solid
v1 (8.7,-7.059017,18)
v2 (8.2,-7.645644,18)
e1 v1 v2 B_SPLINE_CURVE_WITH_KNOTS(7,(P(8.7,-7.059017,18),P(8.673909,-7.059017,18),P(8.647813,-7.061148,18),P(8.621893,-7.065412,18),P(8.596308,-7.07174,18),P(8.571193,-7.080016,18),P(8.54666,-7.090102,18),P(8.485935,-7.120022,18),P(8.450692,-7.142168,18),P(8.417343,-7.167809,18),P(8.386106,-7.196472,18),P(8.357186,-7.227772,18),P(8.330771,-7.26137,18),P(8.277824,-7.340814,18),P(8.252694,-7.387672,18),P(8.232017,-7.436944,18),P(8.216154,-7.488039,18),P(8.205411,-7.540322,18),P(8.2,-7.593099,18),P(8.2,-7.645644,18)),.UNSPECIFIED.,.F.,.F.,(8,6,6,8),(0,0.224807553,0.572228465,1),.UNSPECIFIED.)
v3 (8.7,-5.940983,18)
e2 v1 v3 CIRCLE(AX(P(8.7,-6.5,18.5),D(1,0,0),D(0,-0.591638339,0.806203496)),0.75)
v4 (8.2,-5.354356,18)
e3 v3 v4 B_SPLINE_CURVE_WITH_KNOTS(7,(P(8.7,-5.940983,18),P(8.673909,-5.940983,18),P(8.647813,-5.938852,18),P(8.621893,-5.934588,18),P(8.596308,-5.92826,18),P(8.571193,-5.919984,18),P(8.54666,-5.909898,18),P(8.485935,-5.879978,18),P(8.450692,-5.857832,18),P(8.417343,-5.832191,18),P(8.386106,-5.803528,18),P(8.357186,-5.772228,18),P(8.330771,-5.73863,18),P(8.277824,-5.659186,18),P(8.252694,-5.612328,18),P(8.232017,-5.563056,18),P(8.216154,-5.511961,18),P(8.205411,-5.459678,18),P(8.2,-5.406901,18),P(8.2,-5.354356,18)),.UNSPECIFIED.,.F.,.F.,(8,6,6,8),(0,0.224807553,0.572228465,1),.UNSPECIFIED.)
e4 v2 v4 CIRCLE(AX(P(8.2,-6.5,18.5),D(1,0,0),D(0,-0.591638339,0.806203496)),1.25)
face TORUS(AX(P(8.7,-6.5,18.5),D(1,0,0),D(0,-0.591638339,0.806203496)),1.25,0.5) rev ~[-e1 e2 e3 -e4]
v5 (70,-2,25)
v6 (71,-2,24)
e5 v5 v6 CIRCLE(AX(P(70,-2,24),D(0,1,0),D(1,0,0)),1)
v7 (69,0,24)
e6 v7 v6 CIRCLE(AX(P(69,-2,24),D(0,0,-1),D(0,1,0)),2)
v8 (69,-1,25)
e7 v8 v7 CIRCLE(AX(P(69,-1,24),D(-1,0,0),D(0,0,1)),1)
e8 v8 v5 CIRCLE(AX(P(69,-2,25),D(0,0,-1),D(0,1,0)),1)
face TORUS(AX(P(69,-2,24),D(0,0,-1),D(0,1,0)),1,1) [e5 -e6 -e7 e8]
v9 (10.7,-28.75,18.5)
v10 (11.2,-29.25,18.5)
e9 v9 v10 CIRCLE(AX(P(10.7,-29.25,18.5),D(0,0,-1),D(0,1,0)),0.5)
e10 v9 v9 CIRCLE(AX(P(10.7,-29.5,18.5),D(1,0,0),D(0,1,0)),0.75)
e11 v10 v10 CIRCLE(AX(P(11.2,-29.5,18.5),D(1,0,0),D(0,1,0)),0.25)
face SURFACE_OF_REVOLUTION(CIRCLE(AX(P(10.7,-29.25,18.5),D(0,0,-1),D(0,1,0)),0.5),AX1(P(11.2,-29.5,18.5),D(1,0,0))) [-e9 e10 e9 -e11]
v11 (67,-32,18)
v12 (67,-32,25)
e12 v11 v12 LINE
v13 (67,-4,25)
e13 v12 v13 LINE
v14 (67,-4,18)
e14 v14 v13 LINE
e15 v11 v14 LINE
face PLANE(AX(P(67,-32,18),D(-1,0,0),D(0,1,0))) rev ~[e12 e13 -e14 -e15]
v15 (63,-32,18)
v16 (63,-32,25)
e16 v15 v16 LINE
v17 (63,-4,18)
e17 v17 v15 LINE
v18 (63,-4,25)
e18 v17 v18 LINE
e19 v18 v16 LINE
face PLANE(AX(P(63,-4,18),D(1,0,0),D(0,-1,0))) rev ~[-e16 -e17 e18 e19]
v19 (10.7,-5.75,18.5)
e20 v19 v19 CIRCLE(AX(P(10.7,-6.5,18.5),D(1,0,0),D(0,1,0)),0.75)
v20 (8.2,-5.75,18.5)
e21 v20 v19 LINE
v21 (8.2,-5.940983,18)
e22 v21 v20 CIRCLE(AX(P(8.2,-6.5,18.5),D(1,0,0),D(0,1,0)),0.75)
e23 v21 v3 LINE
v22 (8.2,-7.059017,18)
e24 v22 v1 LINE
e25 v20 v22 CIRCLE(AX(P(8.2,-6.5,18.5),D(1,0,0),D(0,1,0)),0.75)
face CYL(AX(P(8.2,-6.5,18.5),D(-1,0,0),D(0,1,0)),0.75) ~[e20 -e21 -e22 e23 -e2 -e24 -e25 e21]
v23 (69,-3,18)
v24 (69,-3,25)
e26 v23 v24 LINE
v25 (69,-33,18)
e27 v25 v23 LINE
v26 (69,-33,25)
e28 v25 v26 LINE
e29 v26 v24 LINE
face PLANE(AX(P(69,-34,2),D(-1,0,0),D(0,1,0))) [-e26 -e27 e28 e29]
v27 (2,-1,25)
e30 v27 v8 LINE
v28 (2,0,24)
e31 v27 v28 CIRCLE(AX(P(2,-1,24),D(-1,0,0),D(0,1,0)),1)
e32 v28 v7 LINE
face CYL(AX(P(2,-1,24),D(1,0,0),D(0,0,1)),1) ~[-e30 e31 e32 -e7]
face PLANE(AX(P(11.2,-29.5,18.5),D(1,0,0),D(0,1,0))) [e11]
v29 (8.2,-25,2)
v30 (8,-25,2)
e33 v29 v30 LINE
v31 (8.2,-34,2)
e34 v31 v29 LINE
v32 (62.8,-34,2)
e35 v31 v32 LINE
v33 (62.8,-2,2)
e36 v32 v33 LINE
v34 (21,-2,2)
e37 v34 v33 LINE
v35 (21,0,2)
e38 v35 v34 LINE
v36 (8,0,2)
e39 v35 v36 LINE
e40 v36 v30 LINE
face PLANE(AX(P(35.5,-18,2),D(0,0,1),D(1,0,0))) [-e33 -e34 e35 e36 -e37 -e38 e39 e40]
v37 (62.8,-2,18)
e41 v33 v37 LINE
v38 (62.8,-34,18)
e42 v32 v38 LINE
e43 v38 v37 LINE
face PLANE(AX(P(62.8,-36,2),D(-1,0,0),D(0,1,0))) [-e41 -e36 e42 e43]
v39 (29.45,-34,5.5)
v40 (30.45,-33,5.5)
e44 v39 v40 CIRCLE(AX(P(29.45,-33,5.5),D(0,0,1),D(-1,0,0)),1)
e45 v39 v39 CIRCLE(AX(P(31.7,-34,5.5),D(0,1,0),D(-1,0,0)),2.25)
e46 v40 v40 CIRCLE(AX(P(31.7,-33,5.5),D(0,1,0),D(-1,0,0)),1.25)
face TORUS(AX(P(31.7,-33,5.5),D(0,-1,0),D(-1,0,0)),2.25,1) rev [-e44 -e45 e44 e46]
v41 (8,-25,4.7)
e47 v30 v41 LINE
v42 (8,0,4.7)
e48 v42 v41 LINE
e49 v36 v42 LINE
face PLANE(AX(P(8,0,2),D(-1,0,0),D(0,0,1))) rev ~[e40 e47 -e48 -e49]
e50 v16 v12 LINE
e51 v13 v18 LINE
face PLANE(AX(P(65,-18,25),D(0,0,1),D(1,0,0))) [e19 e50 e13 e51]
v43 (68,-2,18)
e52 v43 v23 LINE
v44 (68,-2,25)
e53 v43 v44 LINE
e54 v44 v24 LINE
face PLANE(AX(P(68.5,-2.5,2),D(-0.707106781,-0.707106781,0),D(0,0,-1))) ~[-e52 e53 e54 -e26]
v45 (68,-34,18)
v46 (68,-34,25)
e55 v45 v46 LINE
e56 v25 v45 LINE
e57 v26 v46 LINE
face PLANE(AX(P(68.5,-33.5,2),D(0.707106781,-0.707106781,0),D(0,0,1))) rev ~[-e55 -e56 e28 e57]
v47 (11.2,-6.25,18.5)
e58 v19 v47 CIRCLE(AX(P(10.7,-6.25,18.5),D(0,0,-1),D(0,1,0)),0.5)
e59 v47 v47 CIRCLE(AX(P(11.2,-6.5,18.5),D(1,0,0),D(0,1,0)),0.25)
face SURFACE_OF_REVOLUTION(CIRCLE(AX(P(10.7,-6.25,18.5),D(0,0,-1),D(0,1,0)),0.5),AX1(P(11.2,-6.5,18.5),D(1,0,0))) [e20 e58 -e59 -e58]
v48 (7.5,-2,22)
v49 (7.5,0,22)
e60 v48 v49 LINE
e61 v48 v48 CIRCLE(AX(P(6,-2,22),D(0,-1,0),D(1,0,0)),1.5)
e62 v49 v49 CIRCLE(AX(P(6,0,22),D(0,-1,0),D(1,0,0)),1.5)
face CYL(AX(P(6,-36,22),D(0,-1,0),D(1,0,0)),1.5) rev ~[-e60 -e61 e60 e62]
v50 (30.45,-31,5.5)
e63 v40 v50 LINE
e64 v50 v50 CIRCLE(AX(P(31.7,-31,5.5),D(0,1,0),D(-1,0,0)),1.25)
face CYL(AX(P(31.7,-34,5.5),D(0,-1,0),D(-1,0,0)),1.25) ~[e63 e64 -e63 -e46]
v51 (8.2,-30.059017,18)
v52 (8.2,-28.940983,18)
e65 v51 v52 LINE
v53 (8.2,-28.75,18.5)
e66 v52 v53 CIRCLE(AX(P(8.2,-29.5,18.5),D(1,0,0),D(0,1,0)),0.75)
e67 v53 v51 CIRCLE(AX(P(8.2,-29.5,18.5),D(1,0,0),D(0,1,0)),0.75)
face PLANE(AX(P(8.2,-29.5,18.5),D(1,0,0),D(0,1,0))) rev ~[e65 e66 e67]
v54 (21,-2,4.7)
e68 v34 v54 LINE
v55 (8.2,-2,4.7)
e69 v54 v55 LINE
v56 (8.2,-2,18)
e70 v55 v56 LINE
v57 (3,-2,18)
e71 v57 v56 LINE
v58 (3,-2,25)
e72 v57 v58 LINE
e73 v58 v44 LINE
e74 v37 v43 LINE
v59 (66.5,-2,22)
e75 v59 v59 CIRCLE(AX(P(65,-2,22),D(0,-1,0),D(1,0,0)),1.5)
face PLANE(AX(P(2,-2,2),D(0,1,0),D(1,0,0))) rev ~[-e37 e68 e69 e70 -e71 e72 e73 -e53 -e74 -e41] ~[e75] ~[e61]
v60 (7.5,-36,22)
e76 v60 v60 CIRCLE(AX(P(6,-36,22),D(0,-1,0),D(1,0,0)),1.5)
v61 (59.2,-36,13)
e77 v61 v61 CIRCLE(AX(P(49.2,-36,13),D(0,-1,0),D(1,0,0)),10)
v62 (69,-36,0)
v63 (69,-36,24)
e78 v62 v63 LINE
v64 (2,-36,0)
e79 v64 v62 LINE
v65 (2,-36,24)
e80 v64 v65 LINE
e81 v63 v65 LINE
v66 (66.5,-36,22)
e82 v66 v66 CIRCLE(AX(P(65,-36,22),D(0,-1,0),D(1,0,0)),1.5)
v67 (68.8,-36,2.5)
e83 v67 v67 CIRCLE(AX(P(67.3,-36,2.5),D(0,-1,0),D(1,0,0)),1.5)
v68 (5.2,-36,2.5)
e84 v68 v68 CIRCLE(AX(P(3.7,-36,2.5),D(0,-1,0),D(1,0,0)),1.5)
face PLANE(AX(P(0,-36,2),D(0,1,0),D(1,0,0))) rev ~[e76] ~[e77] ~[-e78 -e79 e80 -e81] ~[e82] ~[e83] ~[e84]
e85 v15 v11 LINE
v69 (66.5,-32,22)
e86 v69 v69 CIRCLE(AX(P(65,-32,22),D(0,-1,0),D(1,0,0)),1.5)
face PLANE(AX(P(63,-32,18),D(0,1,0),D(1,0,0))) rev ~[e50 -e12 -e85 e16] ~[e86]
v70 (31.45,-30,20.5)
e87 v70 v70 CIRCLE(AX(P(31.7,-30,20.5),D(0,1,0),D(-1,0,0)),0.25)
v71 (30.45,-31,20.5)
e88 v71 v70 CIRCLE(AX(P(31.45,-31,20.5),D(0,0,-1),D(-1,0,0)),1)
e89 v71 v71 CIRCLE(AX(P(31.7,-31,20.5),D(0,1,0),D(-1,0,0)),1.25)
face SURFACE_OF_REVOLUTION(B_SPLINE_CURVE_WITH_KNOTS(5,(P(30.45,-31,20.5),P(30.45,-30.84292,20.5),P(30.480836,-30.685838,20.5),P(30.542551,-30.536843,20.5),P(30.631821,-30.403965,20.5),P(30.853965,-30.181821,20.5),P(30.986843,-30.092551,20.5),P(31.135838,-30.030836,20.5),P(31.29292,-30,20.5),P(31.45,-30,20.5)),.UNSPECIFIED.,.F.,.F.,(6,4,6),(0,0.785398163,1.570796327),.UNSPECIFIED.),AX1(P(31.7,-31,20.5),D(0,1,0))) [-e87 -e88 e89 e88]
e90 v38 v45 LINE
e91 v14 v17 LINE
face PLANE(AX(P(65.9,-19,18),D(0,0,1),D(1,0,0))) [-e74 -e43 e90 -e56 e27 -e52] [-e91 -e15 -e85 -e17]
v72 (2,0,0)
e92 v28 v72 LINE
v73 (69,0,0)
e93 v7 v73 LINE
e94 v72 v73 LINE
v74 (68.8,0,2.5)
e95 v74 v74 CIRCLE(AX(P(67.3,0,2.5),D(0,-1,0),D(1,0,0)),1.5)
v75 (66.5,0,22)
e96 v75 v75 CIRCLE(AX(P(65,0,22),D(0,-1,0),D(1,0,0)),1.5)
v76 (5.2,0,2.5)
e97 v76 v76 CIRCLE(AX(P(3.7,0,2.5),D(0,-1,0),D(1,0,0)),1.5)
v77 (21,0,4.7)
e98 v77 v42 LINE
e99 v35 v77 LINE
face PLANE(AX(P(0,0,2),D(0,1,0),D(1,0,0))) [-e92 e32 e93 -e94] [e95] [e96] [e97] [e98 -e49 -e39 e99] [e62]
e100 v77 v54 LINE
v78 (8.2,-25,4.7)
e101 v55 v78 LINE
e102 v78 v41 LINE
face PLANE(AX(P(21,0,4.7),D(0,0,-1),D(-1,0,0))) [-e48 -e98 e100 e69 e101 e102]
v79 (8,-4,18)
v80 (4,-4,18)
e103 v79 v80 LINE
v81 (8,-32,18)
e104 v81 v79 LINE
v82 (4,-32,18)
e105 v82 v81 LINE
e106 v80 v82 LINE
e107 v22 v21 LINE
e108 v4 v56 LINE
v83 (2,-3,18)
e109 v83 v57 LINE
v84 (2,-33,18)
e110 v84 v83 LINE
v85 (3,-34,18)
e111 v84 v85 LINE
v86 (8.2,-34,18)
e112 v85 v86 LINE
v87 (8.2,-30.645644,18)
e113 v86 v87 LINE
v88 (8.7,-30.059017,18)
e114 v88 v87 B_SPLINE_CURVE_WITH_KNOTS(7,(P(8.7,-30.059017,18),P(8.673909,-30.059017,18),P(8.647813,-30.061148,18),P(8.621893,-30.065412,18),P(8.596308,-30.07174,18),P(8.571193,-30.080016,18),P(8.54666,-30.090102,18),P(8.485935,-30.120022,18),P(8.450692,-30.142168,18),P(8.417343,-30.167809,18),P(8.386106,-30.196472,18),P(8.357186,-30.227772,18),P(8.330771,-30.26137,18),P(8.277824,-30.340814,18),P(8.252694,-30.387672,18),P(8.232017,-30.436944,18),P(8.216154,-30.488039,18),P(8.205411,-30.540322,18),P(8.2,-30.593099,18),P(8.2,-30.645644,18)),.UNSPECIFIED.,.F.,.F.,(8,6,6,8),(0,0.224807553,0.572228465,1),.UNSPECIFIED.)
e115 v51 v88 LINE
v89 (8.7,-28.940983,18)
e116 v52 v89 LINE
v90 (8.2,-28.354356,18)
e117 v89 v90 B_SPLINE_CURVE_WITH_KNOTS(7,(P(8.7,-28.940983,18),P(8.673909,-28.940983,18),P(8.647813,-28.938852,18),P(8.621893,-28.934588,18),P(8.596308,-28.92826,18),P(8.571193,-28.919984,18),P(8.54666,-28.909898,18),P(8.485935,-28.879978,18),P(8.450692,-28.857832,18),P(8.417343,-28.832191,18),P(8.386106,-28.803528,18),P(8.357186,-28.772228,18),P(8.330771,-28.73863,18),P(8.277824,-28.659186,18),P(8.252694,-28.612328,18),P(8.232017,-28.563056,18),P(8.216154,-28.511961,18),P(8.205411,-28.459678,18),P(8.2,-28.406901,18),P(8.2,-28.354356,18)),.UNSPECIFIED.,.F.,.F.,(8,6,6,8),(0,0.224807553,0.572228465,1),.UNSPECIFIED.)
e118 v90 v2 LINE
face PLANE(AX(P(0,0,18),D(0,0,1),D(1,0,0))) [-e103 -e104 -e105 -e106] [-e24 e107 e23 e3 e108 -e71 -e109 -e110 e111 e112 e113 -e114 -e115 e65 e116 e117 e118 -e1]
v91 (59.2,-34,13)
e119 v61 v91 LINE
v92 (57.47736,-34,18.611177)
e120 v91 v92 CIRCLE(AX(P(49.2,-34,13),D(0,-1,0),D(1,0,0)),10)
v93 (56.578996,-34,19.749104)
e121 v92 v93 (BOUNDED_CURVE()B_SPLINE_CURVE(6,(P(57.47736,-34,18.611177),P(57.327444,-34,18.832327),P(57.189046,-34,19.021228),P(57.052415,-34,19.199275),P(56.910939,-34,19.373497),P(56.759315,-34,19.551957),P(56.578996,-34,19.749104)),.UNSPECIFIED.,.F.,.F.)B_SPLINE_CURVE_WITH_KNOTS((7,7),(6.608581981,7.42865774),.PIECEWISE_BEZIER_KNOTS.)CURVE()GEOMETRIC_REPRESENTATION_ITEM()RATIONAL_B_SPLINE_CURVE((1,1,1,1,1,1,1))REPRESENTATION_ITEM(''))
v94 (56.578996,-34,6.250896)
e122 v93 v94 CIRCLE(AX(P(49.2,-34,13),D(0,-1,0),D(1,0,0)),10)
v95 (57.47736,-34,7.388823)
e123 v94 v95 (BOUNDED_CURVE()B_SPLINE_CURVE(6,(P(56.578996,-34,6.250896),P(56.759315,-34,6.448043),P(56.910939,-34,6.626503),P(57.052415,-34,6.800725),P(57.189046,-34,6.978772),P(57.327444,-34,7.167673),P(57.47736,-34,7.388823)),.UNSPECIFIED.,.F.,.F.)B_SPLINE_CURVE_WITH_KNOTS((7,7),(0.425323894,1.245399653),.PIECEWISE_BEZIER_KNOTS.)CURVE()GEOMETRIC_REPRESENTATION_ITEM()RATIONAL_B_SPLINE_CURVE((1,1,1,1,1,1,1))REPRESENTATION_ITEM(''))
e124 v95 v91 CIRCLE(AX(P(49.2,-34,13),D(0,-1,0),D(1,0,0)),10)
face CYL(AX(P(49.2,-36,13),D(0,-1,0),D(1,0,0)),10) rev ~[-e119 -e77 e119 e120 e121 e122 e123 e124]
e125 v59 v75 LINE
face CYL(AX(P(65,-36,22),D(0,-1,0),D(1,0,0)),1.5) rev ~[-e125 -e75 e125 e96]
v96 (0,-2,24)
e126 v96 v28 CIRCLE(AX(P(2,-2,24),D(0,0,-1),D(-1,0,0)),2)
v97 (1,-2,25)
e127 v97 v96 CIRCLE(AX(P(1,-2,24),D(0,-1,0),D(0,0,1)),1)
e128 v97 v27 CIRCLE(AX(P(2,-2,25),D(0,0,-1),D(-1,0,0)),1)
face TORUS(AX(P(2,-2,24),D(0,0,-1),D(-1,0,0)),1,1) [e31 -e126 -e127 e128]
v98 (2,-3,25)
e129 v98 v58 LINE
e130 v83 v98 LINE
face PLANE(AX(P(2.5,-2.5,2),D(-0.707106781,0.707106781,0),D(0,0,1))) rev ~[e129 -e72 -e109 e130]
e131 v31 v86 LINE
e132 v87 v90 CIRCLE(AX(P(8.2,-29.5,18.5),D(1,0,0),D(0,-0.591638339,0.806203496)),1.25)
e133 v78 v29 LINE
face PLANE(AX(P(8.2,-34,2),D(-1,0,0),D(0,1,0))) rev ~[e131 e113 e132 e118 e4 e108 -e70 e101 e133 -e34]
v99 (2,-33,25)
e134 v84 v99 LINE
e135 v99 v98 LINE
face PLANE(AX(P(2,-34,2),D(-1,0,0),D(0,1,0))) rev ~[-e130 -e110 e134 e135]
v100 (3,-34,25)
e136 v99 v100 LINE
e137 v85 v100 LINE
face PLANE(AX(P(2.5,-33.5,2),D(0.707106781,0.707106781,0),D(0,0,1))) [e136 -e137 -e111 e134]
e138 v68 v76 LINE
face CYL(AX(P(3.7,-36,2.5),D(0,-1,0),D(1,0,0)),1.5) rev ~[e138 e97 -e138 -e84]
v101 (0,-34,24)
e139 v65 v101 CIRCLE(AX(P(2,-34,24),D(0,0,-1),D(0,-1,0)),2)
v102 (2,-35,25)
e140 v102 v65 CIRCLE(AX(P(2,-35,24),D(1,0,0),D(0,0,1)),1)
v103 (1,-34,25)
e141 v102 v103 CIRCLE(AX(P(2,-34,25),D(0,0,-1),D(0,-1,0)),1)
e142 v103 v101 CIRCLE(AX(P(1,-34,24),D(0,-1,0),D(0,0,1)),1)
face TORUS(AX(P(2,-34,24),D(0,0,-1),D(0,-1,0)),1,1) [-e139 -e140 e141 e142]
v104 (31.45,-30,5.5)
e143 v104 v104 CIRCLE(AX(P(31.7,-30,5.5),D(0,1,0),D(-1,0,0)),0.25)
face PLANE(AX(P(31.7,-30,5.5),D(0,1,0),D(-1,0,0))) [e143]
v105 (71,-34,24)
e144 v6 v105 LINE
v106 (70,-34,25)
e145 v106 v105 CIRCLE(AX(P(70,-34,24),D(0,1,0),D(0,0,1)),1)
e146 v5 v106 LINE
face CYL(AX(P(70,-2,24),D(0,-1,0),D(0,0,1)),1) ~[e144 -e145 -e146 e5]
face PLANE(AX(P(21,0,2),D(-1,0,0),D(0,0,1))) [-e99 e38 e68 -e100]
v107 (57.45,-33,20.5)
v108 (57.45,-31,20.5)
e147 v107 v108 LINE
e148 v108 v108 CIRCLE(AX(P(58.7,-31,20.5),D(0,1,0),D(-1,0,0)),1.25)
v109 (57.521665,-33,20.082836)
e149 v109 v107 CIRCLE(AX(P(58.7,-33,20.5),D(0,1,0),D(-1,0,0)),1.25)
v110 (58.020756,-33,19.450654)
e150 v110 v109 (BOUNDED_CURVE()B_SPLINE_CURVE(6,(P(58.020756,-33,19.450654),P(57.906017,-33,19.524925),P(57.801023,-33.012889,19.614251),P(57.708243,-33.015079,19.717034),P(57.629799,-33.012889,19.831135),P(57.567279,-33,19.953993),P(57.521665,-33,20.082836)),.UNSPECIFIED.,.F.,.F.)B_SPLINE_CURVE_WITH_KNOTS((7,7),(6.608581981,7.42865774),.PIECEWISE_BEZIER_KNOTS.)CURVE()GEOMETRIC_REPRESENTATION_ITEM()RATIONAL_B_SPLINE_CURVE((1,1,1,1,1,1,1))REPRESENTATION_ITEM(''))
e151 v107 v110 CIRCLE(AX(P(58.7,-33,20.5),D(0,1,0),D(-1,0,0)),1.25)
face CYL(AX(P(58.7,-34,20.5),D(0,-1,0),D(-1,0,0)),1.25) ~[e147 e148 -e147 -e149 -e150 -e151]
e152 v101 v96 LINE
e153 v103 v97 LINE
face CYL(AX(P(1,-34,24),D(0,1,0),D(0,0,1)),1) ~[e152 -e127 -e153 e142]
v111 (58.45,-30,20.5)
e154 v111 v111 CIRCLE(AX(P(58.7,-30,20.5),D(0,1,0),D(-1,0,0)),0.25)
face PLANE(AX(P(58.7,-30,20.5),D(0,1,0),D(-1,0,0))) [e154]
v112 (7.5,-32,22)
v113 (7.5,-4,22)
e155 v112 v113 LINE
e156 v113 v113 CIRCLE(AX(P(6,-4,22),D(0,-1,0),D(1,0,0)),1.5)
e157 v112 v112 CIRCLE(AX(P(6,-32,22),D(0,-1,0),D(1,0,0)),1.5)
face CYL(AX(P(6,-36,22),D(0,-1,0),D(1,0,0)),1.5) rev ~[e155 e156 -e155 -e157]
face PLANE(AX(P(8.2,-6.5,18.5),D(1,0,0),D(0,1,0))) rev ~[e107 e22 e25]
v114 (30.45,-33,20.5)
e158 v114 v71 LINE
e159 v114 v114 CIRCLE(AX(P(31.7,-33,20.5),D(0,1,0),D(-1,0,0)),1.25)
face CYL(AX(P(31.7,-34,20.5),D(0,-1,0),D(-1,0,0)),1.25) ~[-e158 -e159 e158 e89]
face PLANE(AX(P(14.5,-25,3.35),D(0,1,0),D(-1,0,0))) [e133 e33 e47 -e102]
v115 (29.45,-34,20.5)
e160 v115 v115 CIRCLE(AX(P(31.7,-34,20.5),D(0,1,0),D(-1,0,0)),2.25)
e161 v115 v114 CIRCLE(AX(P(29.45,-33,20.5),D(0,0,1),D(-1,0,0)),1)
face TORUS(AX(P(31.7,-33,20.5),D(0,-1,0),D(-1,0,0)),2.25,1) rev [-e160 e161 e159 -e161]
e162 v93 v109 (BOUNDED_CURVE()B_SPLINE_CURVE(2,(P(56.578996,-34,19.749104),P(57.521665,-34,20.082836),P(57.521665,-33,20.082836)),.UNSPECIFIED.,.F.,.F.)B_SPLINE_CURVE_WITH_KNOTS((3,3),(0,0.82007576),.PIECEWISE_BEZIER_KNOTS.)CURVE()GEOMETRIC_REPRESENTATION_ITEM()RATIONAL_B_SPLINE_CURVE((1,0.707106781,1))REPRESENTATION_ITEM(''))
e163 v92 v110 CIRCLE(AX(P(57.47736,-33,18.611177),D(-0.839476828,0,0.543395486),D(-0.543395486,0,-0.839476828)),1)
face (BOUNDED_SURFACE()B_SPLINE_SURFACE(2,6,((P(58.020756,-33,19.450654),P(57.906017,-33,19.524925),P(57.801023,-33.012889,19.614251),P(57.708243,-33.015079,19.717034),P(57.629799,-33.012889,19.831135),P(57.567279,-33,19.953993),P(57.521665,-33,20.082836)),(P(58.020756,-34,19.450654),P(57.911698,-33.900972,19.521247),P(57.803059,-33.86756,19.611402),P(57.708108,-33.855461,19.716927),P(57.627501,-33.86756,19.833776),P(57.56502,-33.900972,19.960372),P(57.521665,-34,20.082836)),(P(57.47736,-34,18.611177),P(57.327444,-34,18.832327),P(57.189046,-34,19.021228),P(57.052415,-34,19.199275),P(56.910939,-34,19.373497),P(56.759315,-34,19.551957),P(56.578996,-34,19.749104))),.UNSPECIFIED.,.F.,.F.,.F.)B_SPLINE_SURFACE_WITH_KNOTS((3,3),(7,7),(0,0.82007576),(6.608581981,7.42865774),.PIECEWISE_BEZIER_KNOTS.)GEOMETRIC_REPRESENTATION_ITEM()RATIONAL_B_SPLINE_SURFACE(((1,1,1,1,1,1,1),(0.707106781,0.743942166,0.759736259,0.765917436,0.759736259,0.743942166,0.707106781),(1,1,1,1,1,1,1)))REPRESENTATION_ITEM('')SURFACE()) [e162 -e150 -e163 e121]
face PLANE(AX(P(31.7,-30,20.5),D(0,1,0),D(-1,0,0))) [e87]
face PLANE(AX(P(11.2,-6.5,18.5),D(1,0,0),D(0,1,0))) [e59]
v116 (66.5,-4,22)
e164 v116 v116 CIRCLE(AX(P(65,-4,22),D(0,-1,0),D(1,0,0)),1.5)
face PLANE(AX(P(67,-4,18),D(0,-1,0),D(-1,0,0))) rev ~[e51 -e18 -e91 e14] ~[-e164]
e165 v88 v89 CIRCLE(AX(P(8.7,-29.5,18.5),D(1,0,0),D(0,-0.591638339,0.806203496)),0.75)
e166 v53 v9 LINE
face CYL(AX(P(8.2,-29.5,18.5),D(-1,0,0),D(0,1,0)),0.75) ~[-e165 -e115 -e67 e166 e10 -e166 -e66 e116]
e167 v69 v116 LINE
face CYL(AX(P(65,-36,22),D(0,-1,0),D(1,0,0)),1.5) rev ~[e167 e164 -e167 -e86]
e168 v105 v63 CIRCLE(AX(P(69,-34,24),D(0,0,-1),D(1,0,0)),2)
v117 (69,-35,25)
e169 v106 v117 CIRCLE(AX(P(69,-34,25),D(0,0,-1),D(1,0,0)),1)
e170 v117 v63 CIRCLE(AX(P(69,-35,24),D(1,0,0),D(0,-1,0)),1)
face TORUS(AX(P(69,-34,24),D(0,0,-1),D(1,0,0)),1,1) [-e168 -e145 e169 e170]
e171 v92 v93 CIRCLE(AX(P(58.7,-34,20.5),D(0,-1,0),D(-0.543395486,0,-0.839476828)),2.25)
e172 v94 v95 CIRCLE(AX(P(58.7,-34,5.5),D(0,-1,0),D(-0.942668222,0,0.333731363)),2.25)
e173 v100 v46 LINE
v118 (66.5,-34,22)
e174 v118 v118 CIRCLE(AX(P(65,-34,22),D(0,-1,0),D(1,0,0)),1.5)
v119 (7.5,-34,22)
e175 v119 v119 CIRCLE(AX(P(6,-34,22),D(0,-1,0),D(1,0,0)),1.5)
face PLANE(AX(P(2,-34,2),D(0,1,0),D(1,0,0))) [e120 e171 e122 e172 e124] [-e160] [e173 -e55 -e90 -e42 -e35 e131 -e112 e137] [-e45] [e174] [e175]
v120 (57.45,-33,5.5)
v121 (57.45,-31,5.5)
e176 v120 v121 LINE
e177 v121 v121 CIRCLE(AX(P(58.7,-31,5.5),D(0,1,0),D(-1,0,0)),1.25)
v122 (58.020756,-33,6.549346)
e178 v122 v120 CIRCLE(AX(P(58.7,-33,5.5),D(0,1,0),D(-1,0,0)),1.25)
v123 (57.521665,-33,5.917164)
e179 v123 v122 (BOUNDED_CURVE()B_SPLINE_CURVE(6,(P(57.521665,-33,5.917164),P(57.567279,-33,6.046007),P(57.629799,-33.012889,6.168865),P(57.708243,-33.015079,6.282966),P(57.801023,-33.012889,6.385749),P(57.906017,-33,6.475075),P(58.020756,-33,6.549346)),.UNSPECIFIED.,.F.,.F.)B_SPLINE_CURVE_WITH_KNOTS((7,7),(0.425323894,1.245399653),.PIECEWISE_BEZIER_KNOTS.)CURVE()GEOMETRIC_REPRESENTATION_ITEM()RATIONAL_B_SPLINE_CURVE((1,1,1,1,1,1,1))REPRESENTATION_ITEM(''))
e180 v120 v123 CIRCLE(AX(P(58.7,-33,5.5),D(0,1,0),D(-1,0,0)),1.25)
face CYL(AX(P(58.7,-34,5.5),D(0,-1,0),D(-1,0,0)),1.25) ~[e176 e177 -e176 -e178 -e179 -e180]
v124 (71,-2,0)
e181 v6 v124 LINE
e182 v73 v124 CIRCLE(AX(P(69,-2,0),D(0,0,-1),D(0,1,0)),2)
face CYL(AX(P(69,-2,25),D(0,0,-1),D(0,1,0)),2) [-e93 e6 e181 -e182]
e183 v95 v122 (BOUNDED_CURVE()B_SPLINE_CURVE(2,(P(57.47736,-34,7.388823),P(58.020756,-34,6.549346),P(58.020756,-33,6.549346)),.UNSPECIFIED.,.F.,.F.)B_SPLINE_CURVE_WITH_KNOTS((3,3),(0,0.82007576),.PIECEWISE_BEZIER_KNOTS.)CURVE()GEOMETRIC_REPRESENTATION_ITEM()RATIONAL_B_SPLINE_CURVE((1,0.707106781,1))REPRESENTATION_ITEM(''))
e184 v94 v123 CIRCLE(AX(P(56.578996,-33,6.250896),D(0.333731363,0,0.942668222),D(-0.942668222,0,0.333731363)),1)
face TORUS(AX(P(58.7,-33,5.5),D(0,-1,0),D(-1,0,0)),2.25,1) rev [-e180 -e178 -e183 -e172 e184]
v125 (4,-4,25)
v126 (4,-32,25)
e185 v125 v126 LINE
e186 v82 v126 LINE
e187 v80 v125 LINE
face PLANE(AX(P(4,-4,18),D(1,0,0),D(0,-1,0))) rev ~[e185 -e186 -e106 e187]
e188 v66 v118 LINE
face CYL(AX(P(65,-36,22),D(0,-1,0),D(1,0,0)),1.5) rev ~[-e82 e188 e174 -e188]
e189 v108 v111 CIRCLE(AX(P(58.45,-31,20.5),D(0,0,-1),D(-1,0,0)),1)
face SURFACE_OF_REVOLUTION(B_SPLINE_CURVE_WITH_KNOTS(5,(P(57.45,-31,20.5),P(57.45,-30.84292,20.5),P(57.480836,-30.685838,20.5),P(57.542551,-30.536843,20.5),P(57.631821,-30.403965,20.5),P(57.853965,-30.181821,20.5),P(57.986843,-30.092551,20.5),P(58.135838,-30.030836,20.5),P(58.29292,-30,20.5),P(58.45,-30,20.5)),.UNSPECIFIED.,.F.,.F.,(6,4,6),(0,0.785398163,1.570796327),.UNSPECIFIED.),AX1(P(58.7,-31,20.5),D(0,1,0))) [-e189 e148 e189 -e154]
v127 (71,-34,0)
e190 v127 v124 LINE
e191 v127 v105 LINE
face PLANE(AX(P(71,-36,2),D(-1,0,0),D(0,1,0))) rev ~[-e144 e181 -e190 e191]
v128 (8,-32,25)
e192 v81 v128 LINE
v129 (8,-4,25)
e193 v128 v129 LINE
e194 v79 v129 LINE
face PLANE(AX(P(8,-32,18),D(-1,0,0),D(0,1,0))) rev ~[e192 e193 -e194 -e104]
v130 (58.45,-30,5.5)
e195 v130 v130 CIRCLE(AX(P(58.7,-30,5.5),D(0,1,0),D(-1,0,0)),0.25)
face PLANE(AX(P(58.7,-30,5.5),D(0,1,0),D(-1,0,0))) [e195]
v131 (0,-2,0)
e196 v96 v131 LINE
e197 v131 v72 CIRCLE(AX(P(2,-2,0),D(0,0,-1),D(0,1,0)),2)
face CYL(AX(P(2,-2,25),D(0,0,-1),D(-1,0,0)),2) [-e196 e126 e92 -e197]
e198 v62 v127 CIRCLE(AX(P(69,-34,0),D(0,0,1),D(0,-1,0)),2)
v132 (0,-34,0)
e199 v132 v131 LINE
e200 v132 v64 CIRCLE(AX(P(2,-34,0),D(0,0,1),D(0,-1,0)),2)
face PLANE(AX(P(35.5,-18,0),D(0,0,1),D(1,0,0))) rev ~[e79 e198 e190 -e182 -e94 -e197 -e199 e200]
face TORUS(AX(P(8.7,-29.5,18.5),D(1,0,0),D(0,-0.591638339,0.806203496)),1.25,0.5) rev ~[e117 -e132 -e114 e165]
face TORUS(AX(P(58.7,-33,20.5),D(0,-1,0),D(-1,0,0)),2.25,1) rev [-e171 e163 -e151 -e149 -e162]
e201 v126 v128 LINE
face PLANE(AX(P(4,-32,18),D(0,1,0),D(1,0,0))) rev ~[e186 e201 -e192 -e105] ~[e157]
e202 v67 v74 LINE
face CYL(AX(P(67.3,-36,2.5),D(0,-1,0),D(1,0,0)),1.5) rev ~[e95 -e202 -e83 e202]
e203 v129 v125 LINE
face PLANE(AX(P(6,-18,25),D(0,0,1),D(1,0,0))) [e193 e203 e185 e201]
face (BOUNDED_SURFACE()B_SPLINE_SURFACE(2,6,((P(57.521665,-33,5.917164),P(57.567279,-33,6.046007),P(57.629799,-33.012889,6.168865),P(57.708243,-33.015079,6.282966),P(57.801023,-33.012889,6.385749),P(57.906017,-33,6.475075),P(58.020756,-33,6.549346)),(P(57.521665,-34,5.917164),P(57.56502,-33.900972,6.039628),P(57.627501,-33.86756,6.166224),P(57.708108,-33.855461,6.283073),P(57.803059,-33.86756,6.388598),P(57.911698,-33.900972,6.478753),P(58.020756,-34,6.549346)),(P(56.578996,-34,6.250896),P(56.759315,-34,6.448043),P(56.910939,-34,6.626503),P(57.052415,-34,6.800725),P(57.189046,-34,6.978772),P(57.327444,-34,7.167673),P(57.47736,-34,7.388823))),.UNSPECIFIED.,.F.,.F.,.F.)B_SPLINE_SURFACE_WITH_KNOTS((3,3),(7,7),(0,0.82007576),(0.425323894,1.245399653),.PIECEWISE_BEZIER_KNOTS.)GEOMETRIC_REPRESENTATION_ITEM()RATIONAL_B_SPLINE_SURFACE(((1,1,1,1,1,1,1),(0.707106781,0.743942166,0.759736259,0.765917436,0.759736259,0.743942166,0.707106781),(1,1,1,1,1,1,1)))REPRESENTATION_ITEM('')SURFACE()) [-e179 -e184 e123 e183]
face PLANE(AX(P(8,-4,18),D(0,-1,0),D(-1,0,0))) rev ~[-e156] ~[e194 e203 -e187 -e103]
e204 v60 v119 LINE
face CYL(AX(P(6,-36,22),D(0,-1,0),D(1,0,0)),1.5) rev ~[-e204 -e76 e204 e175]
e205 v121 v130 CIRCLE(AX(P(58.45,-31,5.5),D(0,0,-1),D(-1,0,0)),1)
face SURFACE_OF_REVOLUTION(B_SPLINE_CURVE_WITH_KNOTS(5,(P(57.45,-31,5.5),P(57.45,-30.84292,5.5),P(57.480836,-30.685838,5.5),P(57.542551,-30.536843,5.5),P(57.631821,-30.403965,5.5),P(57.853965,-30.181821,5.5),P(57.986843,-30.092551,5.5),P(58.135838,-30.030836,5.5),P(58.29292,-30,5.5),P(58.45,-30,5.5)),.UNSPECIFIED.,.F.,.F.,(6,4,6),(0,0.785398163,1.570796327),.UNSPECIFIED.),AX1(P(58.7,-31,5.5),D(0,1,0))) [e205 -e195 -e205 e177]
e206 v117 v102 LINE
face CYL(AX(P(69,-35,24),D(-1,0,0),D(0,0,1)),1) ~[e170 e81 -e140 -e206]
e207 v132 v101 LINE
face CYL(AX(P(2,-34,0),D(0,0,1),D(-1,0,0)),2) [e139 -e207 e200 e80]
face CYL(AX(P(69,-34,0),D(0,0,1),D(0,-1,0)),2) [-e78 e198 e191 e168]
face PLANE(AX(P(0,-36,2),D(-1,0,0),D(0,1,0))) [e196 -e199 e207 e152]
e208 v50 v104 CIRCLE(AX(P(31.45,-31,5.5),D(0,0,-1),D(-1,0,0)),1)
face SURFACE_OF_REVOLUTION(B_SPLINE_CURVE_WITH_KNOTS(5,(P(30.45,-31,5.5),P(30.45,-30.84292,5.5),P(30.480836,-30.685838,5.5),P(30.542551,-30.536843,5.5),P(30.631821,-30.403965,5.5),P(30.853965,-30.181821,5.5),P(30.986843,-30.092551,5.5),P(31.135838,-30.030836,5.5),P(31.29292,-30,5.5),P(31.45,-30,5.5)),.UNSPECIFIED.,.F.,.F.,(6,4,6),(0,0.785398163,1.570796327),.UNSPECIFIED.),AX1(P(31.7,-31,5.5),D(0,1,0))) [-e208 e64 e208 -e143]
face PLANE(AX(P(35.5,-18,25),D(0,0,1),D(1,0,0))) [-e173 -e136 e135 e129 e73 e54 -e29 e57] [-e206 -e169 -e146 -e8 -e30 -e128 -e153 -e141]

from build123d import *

# Parameters (mm, degrees)
F0_W         = 71
F0_H         = 36
F1_DEPTH     = 2
F2_W         = 71
F2_H         = 36
F2_W_2       = 67
F2_H_2       = 32
F3_DEPTH     = 23
F4_SIZE      = 1
F5_R         = 2
F6_R         = 1
F7_W         = 6.2
F7_H         = 32
F7_H_2       = 34
F8_DEPTH     = 16
F9_R         = 1.5
F10_DEPTH    = 36.001
F12_DEPTH    = 7
F13_R        = 1.5
F14_DEPTH    = 36.001
F17_R        = 10
F18_DEPTH    = 34
F19_R        = 1.25
F20_DEPTH    = 4
F21_R        = 1
F23_R        = 0.75
F24_DEPTH    = 3
F25_T4_ANGLE = 287.4532878227
F25_T9_ANGLE = 287.4532878227
F26_W        = 13
F26_H        = 2.7
F27_DEPTH    = 25


# Not quite as in the source:
# - a fillet or chamfer that OpenCascade refuses, or shapes differently, is made with other operations: its cross-section is extruded or revolved along the edge and cut away or added


with BuildPart() as f1:
    # F0 (on Top) → F1 (new body)
    with BuildSketch(Plane.XY):
        with Locations((35.5, -18)):
            Rectangle(F0_W, F0_H)
    extrude(amount=F1_DEPTH)

    # F2 (on face) → F3 (join)
    with BuildSketch(Plane.XY.offset(2)):
        with Locations((35.5, -18)):
            Rectangle(F2_W, F2_H)
        with Locations((35.5, -18)):
            Rectangle(F2_W_2, F2_H_2, mode=Mode.SUBTRACT)
    extrude(amount=F3_DEPTH)

    # F4
    f4_edges = [f1.edges().sort_by_distance(p)[0] for p in [
        (2, -2, 13.5),
        (2, -34, 13.5),
        (69, -2, 13.5),
        (69, -34, 13.5),
    ]]
    chamfer(f4_edges, length=F4_SIZE)

    # F5
    f5_edges = [f1.edges().sort_by_distance(p)[0] for p in [
        (0, -36, 12.5),
        (71, -36, 12.5),
        (71, 0, 12.5),
        (0, 0, 12.5),
    ]]
    fillet(f5_edges, radius=F5_R)

    # F6
    f6_edges = [f1.edges().sort_by_distance(p)[0] for p in [
        (0, -18, 25),
        (35.5, -36, 25),
        (71, -18, 25),
        (35.5, 0, 25),
    ]]
    fillet(f6_edges, radius=F6_R)

    # F7 (on face) → F8 (join)
    with BuildSketch(Plane.XY.offset(2)):
        with Locations((5.1, -18)):
            Rectangle(F7_W, F7_H)
        with Locations((65.9, -19)):
            Rectangle(F7_W, F7_H_2)
    extrude(amount=F8_DEPTH)

    # F9 (on face) → F10 (cut, through all)
    with BuildSketch(Plane.XZ.offset(36)):
        with Locations((3.7, 2.5)):
            Circle(F9_R)
        with Locations((67.3, 2.5)):
            Circle(F9_R)
    extrude(amount=-F10_DEPTH, mode=Mode.SUBTRACT)

    # F11 (on face) → F12 (join)
    with BuildSketch(Plane.XY.offset(18)):
        Polygon((8, -21.2), (8, -4), (4, -4), (4, -21.2), (4, -32), (8, -32), align=None)
        Polygon((67, -4), (63, -4), (63, -22), (63, -32), (67, -32), (67, -22), align=None)
    extrude(amount=F12_DEPTH)

    # F13 (on face) → F14 (cut, through all)
    with BuildSketch(Plane.XZ.offset(36)):
        with Locations((6, 22)):
            Circle(F13_R)
        with Locations((65, 22)):
            Circle(F13_R)
    extrude(amount=-F14_DEPTH, mode=Mode.SUBTRACT)

    # F17 (on face) → F18 (cut, through all)
    with BuildSketch(Plane.XZ.offset(36)):
        with Locations((49.2, 13)):
            Circle(F17_R)
    extrude(amount=-F18_DEPTH, mode=Mode.SUBTRACT)

    # F19 (on face) → F20 (join)
    with BuildSketch(Plane(origin=(0, -34, 0), x_dir=(-1, 0, 0), z_dir=(0, 1, 0))):
        with Locations((-58.7, 20.5)):
            Circle(F19_R)
        with Locations((-31.7, 20.5)):
            Circle(F19_R)
        with Locations((-31.7, 5.5)):
            Circle(F19_R)
        with Locations((-58.7, 5.5)):
            Circle(F19_R)
    extrude(amount=F20_DEPTH)

    # F21
    f21_edges = [f1.edges().sort_by_distance(p)[0] for p in [
        (57.45, -32, 20.5),
        (59.95, -34, 20.5),
        (59.95, -30, 20.5),
        (57.45, -32, 5.5),
        (59.95, -34, 5.5),
        (59.95, -30, 5.5),
        (30.45, -32, 20.5),
        (32.95, -34, 20.5),
        (32.95, -30, 20.5),
        (30.45, -32, 5.5),
        (32.95, -34, 5.5),
        (32.95, -30, 5.5),
    ]]
    fillet(f21_edges, radius=F21_R)

    # F23 (on face) → F24 (join)
    with BuildSketch(Plane.YZ.offset(8.2)):
        with Locations((-29.5, 18.5)):
            Circle(F23_R)
        with Locations((-6.5, 18.5)):
            Circle(F23_R)
    extrude(amount=F24_DEPTH)

    # F25: fillet of radius 0.5 on 6 edges, made by hand


with BuildPart() as f25_tool2:
    # F25_s3 → F25_t4 (revolve)
    with BuildSketch(Plane(origin=(0, -10.3497936524, -7.5952718618), x_dir=(1, 0, 0), z_dir=(0, 0.8062034954, 0.5916383388))):
        with BuildLine():
            ThreePointArc((8.7, -33.1180956607), (8.3464466094, -33.2645422701), (8.2, -33.6180956607))
            Line((8.2, -33.6180956607), (8.2, -33.1180956607))
            Line((8.2, -33.1180956607), (8.7, -33.1180956607))
        make_face()
    revolve(axis=Axis((8.2, -29.5, 18.5), (1, 0, 0)), revolution_arc=F25_T4_ANGLE)

    split(bisect_by=Plane.XY.offset(18), keep=Keep.BOTTOM)


with BuildPart() as f1_1:
    add(f1.part)

    # F25_t1: union F25_tool2
    add(f25_tool2.part)


with BuildPart() as f25_tool7:
    # F25_s8 → F25_t9 (revolve)
    with BuildSketch(Plane(origin=(0, 4.5993800964, 3.3752887643), x_dir=(1, 0, 0), z_dir=(0, 0.8062034954, 0.5916383388))):
        with BuildLine():
            ThreePointArc((8.7, -19.5104138677), (8.3464466094, -19.6568604771), (8.2, -20.0104138677))
            Line((8.2, -20.0104138677), (8.2, -19.5104138677))
            Line((8.2, -19.5104138677), (8.7, -19.5104138677))
        make_face()
    revolve(axis=Axis((8.2, -6.5, 18.5), (1, 0, 0)), revolution_arc=F25_T9_ANGLE)

    split(bisect_by=Plane.XY.offset(18), keep=Keep.BOTTOM)


with BuildPart() as f1_2:
    add(f1_1.part)

    # F25_t6: union F25_tool7
    add(f25_tool7.part)

    # F25_s11 → F25_t12 (revolve, cut)
    with BuildSketch(Plane.XY.offset(18.5)):
        with BuildLine():
            ThreePointArc((10.7, -28.75), (11.0535533906, -28.8964466094), (11.2, -29.25))
            Line((11.2, -29.25), (11.2, -28.75))
            Line((11.2, -28.75), (10.7, -28.75))
        make_face()
    revolve(axis=Axis((11.2, -29.5, 18.5), (1, 0, 0)), mode=Mode.SUBTRACT)

    # F25_s13 → F25_t14 (revolve, cut)
    with BuildSketch(Plane.XY.offset(18.5)):
        with BuildLine():
            ThreePointArc((10.7, -5.75), (11.0535533906, -5.8964466094), (11.2, -6.25))
            Line((11.2, -6.25), (11.2, -5.75))
            Line((11.2, -5.75), (10.7, -5.75))
        make_face()
    revolve(axis=Axis((11.2, -6.5, 18.5), (1, 0, 0)), mode=Mode.SUBTRACT)

    # F26 (on face) → F27 (cut)
    with BuildSketch(Plane(origin=(0, 0, 0), x_dir=(-1, 0, 0), z_dir=(0, 1, 0))):
        with Locations((-14.5, 3.35)):
            Rectangle(F26_W, F26_H)
    extrude(amount=-F27_DEPTH, mode=Mode.SUBTRACT)


solid = f1_2.part
